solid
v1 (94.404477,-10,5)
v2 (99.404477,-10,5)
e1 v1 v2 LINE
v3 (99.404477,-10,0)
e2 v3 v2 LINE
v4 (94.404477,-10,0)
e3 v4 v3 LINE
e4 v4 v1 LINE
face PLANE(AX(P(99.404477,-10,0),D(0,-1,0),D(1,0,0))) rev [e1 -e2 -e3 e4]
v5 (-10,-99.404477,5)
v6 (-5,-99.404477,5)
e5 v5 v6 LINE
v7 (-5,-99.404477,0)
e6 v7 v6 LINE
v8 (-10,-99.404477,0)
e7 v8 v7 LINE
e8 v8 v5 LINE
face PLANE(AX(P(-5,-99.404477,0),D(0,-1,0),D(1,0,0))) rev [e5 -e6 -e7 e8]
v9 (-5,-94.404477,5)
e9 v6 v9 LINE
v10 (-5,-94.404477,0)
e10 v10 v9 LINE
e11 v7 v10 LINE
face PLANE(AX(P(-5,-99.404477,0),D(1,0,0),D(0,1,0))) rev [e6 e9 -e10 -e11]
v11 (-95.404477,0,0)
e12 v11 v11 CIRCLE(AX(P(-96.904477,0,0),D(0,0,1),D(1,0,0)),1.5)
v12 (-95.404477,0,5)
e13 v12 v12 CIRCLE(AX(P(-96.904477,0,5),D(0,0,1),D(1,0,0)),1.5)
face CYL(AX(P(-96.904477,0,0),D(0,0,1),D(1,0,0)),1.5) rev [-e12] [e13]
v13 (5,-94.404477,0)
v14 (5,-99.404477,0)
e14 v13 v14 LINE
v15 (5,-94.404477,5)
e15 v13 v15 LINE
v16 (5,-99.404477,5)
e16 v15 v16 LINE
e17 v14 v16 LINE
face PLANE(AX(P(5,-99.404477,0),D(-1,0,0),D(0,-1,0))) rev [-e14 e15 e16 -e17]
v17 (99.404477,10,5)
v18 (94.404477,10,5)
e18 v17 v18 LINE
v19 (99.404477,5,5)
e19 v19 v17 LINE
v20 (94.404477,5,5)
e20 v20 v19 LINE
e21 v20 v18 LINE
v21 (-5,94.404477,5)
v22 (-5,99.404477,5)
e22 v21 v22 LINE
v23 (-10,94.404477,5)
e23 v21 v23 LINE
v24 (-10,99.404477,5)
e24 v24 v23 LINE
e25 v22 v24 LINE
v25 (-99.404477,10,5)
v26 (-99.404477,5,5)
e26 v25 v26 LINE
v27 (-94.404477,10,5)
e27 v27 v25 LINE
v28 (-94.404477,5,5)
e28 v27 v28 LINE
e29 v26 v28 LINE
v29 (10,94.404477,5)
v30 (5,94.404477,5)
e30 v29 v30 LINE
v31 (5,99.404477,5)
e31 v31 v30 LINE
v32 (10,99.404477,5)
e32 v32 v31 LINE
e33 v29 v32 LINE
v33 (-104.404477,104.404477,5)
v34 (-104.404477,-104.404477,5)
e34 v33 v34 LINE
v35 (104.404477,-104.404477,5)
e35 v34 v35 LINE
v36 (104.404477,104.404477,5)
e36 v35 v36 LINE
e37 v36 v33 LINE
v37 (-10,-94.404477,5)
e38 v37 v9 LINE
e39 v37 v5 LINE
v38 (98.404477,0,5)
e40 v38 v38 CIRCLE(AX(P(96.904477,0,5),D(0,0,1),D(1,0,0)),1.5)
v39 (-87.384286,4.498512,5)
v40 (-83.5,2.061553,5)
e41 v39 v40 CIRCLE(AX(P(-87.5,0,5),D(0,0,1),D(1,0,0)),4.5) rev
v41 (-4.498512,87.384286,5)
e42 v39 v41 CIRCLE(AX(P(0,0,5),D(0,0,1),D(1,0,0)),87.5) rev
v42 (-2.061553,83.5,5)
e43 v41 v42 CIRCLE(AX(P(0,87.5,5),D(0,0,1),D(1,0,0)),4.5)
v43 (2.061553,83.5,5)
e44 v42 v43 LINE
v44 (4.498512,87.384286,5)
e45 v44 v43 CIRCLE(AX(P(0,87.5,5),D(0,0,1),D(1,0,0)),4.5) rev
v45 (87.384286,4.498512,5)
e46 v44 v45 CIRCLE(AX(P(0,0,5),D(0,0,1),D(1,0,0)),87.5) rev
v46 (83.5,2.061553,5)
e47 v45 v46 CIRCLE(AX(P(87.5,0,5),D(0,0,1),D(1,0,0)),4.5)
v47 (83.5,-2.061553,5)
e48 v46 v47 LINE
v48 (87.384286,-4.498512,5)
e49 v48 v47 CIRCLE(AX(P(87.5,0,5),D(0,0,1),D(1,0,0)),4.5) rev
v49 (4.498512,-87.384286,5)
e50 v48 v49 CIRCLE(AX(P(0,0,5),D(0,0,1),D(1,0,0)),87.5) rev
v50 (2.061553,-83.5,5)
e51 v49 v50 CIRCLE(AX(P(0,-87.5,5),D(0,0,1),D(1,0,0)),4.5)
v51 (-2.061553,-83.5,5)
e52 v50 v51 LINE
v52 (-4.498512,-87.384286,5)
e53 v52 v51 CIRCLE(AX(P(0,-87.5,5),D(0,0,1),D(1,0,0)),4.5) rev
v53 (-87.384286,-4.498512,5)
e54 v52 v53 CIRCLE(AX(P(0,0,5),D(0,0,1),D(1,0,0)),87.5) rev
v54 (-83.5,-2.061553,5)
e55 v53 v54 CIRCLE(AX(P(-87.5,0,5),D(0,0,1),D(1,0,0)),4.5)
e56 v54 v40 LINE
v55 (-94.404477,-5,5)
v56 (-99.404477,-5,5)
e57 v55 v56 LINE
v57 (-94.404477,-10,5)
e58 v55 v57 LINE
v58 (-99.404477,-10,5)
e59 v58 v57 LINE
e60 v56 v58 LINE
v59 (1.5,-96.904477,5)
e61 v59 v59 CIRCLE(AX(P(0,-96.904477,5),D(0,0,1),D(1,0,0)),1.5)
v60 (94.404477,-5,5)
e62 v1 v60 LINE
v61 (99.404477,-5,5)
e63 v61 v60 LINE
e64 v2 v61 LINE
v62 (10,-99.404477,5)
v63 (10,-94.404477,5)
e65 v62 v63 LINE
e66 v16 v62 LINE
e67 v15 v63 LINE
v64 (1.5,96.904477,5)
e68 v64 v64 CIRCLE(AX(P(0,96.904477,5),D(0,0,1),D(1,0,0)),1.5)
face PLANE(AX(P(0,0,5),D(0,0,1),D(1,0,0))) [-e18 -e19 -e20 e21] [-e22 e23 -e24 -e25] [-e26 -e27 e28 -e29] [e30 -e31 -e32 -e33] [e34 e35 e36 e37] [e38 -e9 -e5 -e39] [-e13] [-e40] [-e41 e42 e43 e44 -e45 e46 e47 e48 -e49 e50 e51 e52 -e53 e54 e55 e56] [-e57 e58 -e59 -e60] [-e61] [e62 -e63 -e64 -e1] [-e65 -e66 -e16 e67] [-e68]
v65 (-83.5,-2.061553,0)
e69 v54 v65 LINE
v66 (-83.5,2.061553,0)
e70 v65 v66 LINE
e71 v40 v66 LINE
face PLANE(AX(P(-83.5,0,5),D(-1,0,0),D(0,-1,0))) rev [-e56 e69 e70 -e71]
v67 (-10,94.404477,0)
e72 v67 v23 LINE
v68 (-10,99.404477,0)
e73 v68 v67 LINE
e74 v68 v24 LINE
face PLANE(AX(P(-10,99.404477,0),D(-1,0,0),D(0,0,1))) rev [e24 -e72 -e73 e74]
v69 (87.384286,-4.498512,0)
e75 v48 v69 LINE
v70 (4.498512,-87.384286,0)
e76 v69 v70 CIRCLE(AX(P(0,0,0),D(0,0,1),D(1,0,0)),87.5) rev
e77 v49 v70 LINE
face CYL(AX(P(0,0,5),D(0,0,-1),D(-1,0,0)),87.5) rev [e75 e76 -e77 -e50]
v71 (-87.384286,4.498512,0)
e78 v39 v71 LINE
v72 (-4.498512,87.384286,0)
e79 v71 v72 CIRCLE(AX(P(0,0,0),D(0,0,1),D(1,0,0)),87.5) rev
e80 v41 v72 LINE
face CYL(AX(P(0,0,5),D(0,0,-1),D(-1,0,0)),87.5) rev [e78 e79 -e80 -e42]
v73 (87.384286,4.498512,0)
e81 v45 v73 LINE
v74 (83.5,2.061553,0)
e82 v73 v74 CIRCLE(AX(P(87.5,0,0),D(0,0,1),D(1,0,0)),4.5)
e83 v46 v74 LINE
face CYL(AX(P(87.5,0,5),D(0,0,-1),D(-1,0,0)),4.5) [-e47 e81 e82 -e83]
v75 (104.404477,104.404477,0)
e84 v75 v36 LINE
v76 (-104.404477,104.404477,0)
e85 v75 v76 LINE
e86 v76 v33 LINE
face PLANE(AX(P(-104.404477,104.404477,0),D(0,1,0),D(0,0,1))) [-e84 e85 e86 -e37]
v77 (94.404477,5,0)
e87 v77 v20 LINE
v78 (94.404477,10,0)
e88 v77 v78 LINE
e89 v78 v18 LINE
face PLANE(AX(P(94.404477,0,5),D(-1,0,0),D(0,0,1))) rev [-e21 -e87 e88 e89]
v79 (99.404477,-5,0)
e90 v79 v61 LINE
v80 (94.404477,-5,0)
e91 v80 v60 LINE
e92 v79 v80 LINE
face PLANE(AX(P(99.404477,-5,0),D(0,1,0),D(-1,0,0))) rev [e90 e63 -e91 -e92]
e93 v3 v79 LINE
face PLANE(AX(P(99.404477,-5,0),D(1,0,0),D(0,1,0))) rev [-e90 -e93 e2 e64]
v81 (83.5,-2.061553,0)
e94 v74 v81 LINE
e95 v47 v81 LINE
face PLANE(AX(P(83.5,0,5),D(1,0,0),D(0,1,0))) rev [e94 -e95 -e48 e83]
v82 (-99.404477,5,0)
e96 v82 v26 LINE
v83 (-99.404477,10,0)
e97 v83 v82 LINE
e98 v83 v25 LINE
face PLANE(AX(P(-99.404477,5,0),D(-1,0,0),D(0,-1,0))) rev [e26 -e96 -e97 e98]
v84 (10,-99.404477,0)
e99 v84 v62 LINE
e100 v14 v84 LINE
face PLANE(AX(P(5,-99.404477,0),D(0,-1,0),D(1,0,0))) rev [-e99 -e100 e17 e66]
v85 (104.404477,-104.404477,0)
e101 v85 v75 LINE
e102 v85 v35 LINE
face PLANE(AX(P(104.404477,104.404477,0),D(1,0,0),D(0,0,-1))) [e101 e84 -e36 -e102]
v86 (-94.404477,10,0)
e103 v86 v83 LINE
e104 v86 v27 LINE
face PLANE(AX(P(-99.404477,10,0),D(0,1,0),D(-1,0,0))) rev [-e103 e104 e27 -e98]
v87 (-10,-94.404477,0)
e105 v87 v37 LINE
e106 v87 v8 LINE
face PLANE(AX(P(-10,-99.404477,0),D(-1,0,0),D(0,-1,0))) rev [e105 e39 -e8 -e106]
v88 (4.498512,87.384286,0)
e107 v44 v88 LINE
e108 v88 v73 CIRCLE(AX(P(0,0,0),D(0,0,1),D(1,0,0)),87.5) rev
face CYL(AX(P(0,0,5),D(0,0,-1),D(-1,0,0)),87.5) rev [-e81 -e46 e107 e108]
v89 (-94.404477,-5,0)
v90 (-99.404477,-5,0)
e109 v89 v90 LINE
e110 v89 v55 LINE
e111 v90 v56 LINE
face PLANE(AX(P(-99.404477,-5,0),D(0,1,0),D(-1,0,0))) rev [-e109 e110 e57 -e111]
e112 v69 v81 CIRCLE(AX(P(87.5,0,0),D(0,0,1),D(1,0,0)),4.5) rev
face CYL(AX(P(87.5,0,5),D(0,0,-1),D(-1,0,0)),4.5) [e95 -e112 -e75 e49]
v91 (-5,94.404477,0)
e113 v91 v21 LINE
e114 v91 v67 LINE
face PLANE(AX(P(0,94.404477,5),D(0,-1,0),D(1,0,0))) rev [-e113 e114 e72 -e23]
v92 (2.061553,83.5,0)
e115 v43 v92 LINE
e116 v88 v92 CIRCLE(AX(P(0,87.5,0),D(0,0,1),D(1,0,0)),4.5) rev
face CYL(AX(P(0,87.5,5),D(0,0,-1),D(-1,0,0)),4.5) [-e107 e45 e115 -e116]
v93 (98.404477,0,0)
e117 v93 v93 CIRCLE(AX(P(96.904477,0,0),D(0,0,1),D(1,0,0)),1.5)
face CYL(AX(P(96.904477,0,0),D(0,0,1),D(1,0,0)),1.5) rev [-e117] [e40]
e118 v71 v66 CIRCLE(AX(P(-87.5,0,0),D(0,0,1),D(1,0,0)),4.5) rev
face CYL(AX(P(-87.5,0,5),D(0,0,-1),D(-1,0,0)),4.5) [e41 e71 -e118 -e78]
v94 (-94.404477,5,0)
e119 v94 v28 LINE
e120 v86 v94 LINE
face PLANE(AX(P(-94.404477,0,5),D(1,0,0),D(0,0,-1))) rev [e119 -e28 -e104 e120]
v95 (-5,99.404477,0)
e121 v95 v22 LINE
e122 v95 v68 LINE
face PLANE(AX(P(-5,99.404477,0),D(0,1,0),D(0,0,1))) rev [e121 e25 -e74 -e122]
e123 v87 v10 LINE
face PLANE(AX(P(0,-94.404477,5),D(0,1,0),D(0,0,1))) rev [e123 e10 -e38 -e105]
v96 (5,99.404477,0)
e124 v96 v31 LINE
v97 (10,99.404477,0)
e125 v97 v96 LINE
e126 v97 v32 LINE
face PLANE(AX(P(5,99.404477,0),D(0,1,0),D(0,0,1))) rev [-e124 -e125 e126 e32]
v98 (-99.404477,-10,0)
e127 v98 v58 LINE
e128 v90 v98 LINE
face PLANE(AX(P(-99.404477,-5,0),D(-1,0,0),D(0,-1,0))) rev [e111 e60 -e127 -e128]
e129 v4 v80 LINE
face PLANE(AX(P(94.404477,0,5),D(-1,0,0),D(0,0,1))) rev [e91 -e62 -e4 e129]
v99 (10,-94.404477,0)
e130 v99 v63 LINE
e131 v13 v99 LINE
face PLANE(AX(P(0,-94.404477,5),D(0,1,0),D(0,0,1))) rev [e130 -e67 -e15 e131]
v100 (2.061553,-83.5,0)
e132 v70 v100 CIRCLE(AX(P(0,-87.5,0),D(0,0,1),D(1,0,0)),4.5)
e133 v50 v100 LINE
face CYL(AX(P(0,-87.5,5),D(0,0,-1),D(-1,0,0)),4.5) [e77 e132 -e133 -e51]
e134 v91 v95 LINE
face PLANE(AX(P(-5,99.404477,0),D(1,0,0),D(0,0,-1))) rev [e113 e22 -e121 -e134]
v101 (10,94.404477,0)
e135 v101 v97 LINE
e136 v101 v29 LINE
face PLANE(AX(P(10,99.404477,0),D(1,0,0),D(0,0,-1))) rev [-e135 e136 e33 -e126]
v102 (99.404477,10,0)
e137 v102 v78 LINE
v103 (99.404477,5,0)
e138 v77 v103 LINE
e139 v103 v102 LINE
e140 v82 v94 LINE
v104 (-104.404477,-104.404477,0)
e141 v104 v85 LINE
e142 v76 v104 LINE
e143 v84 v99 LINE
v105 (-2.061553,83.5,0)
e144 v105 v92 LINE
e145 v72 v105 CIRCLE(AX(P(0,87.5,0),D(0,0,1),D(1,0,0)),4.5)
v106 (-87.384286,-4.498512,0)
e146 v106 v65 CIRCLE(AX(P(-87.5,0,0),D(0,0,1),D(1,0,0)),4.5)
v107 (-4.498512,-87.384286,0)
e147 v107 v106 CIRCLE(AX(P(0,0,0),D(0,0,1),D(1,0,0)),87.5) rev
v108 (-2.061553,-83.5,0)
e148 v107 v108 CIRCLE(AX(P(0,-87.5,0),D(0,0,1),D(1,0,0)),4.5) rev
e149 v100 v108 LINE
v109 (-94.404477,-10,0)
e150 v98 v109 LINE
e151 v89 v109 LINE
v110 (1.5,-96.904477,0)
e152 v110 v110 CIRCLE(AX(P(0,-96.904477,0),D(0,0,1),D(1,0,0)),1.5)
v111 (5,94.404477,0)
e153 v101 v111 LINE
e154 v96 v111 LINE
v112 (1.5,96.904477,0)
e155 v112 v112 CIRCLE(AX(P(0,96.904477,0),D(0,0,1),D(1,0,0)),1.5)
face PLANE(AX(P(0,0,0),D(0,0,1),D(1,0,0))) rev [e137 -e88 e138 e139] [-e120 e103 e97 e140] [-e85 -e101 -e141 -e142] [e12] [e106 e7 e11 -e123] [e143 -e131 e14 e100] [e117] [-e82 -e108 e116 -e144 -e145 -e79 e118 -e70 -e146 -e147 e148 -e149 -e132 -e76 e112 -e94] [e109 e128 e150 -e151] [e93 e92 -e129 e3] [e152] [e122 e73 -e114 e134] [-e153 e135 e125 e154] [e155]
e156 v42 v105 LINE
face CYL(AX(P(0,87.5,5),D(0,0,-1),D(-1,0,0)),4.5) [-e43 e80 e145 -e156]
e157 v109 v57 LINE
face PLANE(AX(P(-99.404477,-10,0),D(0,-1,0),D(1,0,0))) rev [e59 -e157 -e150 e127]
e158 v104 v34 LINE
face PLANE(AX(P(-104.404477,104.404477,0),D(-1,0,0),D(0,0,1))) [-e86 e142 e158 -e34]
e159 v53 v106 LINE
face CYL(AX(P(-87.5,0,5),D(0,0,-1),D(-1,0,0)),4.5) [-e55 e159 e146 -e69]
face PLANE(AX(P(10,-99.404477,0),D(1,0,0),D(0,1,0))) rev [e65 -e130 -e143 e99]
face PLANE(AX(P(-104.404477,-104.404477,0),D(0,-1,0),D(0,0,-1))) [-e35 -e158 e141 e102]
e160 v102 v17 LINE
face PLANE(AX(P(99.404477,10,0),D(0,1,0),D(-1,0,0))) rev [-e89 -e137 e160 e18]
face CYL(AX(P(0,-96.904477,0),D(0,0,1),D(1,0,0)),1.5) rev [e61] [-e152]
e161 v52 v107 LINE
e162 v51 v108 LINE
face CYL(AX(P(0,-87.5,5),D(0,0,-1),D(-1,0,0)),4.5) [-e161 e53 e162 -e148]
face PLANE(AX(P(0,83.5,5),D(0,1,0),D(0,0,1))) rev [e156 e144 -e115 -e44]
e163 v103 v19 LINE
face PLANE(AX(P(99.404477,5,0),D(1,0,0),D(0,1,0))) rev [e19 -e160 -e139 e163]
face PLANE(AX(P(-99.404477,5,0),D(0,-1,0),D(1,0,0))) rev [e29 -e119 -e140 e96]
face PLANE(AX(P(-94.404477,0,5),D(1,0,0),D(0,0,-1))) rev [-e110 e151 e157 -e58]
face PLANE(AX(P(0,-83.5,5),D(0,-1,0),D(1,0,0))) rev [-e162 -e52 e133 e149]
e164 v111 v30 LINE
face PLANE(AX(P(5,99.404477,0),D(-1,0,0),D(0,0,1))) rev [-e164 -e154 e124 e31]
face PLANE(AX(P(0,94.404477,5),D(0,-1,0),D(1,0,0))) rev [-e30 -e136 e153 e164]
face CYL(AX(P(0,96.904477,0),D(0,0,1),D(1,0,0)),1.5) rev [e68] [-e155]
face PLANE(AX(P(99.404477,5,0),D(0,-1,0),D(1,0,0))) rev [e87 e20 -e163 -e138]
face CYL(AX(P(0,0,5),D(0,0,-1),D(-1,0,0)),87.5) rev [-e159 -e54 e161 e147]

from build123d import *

# Parameters (mm, degrees)
BOSS_EXTRU_1_DEPTH = 5
BOSS_EXTRU_2_START = -5
ESQUISSE2_W        = 208.80895352
ESQUISSE2_H        = 208.80895352
ESQUISSE2_R        = 87.5
ESQUISSE2_R_2      = 1.5
ESQUISSE2_W_2      = 5
ESQUISSE2_H_2      = 5
BOSS_EXTRU_2_DEPTH = 5


# Read off the part's stored shape, not the designer's step: Boss.-Extru.1
with BuildPart() as part:
    # Boss.-Extru.1 outline → Boss.-Extru.1 (new body)
    with BuildSketch(Plane.XY):
        with BuildLine():
            Line((-15, 94.40447676), (-15, 99.40447676))
            Line((-15, 99.40447676), (-25, 99.40447676))
            ThreePointArc((-25, 99.40447676), (-72.478445072, 72.478445072), (-99.40447676, 25))
            Line((-99.40447676, 25), (-99.40447676, 15))
            Line((-99.40447676, 15), (-94.40447676, 15))
            Line((-94.40447676, 15), (-94.40447676, -15))
            Line((-94.40447676, -15), (-99.40447676, -15))
            Line((-99.40447676, -15), (-99.40447676, -25))
            ThreePointArc((-99.40447676, -25), (-72.478445072, -72.478445072), (-25, -99.40447676))
            Line((-25, -99.40447676), (-15, -99.40447676))
            Line((-15, -99.40447676), (-15, -94.40447676))
            Line((-15, -94.40447676), (15, -94.40447676))
            Line((15, -94.40447676), (15, -99.40447676))
            Line((15, -99.40447676), (25, -99.40447676))
            ThreePointArc((25, -99.40447676), (72.478445072, -72.478445072), (99.40447676, -25))
            Line((99.40447676, -25), (99.40447676, -15))
            Line((99.40447676, -15), (94.40447676, -15))
            Line((94.40447676, -15), (94.40447676, 15))
            Line((94.40447676, 15), (99.40447676, 15))
            Line((99.40447676, 15), (99.40447676, 25))
            ThreePointArc((99.40447676, 25), (72.478445072, 72.478445072), (25, 99.40447676))
            Line((25, 99.40447676), (15, 99.40447676))
            Line((15, 99.40447676), (15, 94.40447676))
            Line((15, 94.40447676), (-15, 94.40447676))
        make_face()
        with BuildLine():
            ThreePointArc((-2.061552813, -83.5), (-3.811893422, -85.108458961), (-4.498511999, -87.384285714))
            ThreePointArc((-4.498511999, -87.384285714), (-61.871843354, -61.871843354), (-87.384285714, -4.498511999))
            ThreePointArc((-87.384285714, -4.498511999), (-85.108458961, -3.811893422), (-83.5, -2.061552813))
            Line((-83.5, -2.061552813), (-83.5, 2.061552813))
            ThreePointArc((-83.5, 2.061552813), (-85.108458961, 3.811893422), (-87.384285714, 4.498511999))
            ThreePointArc((-87.384285714, 4.498511999), (-61.871843354, 61.871843354), (-4.498511999, 87.384285714))
            ThreePointArc((-4.498511999, 87.384285714), (-3.811893422, 85.108458961), (-2.061552813, 83.5))
            Line((-2.061552813, 83.5), (2.061552813, 83.5))
            ThreePointArc((2.061552813, 83.5), (3.811893422, 85.108458961), (4.498511999, 87.384285714))
            ThreePointArc((4.498511999, 87.384285714), (61.871843354, 61.871843354), (87.384285714, 4.498511999))
            ThreePointArc((87.384285714, 4.498511999), (85.108458961, 3.811893422), (83.5, 2.061552813))
            Line((83.5, 2.061552813), (83.5, -2.061552813))
            ThreePointArc((83.5, -2.061552813), (85.108458961, -3.811893422), (87.384285714, -4.498511999))
            ThreePointArc((87.384285714, -4.498511999), (61.871843354, -61.871843354), (4.498511999, -87.384285714))
            ThreePointArc((4.498511999, -87.384285714), (3.811893422, -85.108458961), (2.061552813, -83.5))
            Line((2.061552813, -83.5), (-2.061552813, -83.5))
        make_face(mode=Mode.SUBTRACT)
    extrude(amount=BOSS_EXTRU_1_DEPTH)

    # Esquisse2 → Boss.-Extru.2 (add)
    with BuildSketch(Plane.XY.offset(5).offset(BOSS_EXTRU_2_START)):
        Rectangle(ESQUISSE2_W, ESQUISSE2_H)
        Circle(ESQUISSE2_R, mode=Mode.SUBTRACT)
        with Locations((0, 96.90447676)):
            Circle(ESQUISSE2_R_2, mode=Mode.SUBTRACT)
        with Locations((96.90447676, 0)):
            Circle(ESQUISSE2_R_2, mode=Mode.SUBTRACT)
        with Locations((0, -96.90447676)):
            Circle(ESQUISSE2_R_2, mode=Mode.SUBTRACT)
        with Locations((-96.90447676, 0)):
            Circle(ESQUISSE2_R_2, mode=Mode.SUBTRACT)
        with Locations((-7.5, 96.90447676)):
            Rectangle(ESQUISSE2_W_2, ESQUISSE2_H_2, mode=Mode.SUBTRACT)
        with Locations((7.5, 96.90447676)):
            Rectangle(ESQUISSE2_W_2, ESQUISSE2_H_2, mode=Mode.SUBTRACT)
        with Locations((96.90447676, 7.5)):
            Rectangle(ESQUISSE2_W_2, ESQUISSE2_H_2, mode=Mode.SUBTRACT)
        with Locations((96.90447676, -7.5)):
            Rectangle(ESQUISSE2_W_2, ESQUISSE2_H_2, mode=Mode.SUBTRACT)
        with Locations((7.5, -96.90447676)):
            Rectangle(ESQUISSE2_W_2, ESQUISSE2_H_2, mode=Mode.SUBTRACT)
        with Locations((-7.5, -96.90447676)):
            Rectangle(ESQUISSE2_W_2, ESQUISSE2_H_2, mode=Mode.SUBTRACT)
        with Locations((-96.90447676, -7.5)):
            Rectangle(ESQUISSE2_W_2, ESQUISSE2_H_2, mode=Mode.SUBTRACT)
        with Locations((-96.90447676, 7.5)):
            Rectangle(ESQUISSE2_W_2, ESQUISSE2_H_2, mode=Mode.SUBTRACT)
    extrude(amount=BOSS_EXTRU_2_DEPTH)


solid = part.part
